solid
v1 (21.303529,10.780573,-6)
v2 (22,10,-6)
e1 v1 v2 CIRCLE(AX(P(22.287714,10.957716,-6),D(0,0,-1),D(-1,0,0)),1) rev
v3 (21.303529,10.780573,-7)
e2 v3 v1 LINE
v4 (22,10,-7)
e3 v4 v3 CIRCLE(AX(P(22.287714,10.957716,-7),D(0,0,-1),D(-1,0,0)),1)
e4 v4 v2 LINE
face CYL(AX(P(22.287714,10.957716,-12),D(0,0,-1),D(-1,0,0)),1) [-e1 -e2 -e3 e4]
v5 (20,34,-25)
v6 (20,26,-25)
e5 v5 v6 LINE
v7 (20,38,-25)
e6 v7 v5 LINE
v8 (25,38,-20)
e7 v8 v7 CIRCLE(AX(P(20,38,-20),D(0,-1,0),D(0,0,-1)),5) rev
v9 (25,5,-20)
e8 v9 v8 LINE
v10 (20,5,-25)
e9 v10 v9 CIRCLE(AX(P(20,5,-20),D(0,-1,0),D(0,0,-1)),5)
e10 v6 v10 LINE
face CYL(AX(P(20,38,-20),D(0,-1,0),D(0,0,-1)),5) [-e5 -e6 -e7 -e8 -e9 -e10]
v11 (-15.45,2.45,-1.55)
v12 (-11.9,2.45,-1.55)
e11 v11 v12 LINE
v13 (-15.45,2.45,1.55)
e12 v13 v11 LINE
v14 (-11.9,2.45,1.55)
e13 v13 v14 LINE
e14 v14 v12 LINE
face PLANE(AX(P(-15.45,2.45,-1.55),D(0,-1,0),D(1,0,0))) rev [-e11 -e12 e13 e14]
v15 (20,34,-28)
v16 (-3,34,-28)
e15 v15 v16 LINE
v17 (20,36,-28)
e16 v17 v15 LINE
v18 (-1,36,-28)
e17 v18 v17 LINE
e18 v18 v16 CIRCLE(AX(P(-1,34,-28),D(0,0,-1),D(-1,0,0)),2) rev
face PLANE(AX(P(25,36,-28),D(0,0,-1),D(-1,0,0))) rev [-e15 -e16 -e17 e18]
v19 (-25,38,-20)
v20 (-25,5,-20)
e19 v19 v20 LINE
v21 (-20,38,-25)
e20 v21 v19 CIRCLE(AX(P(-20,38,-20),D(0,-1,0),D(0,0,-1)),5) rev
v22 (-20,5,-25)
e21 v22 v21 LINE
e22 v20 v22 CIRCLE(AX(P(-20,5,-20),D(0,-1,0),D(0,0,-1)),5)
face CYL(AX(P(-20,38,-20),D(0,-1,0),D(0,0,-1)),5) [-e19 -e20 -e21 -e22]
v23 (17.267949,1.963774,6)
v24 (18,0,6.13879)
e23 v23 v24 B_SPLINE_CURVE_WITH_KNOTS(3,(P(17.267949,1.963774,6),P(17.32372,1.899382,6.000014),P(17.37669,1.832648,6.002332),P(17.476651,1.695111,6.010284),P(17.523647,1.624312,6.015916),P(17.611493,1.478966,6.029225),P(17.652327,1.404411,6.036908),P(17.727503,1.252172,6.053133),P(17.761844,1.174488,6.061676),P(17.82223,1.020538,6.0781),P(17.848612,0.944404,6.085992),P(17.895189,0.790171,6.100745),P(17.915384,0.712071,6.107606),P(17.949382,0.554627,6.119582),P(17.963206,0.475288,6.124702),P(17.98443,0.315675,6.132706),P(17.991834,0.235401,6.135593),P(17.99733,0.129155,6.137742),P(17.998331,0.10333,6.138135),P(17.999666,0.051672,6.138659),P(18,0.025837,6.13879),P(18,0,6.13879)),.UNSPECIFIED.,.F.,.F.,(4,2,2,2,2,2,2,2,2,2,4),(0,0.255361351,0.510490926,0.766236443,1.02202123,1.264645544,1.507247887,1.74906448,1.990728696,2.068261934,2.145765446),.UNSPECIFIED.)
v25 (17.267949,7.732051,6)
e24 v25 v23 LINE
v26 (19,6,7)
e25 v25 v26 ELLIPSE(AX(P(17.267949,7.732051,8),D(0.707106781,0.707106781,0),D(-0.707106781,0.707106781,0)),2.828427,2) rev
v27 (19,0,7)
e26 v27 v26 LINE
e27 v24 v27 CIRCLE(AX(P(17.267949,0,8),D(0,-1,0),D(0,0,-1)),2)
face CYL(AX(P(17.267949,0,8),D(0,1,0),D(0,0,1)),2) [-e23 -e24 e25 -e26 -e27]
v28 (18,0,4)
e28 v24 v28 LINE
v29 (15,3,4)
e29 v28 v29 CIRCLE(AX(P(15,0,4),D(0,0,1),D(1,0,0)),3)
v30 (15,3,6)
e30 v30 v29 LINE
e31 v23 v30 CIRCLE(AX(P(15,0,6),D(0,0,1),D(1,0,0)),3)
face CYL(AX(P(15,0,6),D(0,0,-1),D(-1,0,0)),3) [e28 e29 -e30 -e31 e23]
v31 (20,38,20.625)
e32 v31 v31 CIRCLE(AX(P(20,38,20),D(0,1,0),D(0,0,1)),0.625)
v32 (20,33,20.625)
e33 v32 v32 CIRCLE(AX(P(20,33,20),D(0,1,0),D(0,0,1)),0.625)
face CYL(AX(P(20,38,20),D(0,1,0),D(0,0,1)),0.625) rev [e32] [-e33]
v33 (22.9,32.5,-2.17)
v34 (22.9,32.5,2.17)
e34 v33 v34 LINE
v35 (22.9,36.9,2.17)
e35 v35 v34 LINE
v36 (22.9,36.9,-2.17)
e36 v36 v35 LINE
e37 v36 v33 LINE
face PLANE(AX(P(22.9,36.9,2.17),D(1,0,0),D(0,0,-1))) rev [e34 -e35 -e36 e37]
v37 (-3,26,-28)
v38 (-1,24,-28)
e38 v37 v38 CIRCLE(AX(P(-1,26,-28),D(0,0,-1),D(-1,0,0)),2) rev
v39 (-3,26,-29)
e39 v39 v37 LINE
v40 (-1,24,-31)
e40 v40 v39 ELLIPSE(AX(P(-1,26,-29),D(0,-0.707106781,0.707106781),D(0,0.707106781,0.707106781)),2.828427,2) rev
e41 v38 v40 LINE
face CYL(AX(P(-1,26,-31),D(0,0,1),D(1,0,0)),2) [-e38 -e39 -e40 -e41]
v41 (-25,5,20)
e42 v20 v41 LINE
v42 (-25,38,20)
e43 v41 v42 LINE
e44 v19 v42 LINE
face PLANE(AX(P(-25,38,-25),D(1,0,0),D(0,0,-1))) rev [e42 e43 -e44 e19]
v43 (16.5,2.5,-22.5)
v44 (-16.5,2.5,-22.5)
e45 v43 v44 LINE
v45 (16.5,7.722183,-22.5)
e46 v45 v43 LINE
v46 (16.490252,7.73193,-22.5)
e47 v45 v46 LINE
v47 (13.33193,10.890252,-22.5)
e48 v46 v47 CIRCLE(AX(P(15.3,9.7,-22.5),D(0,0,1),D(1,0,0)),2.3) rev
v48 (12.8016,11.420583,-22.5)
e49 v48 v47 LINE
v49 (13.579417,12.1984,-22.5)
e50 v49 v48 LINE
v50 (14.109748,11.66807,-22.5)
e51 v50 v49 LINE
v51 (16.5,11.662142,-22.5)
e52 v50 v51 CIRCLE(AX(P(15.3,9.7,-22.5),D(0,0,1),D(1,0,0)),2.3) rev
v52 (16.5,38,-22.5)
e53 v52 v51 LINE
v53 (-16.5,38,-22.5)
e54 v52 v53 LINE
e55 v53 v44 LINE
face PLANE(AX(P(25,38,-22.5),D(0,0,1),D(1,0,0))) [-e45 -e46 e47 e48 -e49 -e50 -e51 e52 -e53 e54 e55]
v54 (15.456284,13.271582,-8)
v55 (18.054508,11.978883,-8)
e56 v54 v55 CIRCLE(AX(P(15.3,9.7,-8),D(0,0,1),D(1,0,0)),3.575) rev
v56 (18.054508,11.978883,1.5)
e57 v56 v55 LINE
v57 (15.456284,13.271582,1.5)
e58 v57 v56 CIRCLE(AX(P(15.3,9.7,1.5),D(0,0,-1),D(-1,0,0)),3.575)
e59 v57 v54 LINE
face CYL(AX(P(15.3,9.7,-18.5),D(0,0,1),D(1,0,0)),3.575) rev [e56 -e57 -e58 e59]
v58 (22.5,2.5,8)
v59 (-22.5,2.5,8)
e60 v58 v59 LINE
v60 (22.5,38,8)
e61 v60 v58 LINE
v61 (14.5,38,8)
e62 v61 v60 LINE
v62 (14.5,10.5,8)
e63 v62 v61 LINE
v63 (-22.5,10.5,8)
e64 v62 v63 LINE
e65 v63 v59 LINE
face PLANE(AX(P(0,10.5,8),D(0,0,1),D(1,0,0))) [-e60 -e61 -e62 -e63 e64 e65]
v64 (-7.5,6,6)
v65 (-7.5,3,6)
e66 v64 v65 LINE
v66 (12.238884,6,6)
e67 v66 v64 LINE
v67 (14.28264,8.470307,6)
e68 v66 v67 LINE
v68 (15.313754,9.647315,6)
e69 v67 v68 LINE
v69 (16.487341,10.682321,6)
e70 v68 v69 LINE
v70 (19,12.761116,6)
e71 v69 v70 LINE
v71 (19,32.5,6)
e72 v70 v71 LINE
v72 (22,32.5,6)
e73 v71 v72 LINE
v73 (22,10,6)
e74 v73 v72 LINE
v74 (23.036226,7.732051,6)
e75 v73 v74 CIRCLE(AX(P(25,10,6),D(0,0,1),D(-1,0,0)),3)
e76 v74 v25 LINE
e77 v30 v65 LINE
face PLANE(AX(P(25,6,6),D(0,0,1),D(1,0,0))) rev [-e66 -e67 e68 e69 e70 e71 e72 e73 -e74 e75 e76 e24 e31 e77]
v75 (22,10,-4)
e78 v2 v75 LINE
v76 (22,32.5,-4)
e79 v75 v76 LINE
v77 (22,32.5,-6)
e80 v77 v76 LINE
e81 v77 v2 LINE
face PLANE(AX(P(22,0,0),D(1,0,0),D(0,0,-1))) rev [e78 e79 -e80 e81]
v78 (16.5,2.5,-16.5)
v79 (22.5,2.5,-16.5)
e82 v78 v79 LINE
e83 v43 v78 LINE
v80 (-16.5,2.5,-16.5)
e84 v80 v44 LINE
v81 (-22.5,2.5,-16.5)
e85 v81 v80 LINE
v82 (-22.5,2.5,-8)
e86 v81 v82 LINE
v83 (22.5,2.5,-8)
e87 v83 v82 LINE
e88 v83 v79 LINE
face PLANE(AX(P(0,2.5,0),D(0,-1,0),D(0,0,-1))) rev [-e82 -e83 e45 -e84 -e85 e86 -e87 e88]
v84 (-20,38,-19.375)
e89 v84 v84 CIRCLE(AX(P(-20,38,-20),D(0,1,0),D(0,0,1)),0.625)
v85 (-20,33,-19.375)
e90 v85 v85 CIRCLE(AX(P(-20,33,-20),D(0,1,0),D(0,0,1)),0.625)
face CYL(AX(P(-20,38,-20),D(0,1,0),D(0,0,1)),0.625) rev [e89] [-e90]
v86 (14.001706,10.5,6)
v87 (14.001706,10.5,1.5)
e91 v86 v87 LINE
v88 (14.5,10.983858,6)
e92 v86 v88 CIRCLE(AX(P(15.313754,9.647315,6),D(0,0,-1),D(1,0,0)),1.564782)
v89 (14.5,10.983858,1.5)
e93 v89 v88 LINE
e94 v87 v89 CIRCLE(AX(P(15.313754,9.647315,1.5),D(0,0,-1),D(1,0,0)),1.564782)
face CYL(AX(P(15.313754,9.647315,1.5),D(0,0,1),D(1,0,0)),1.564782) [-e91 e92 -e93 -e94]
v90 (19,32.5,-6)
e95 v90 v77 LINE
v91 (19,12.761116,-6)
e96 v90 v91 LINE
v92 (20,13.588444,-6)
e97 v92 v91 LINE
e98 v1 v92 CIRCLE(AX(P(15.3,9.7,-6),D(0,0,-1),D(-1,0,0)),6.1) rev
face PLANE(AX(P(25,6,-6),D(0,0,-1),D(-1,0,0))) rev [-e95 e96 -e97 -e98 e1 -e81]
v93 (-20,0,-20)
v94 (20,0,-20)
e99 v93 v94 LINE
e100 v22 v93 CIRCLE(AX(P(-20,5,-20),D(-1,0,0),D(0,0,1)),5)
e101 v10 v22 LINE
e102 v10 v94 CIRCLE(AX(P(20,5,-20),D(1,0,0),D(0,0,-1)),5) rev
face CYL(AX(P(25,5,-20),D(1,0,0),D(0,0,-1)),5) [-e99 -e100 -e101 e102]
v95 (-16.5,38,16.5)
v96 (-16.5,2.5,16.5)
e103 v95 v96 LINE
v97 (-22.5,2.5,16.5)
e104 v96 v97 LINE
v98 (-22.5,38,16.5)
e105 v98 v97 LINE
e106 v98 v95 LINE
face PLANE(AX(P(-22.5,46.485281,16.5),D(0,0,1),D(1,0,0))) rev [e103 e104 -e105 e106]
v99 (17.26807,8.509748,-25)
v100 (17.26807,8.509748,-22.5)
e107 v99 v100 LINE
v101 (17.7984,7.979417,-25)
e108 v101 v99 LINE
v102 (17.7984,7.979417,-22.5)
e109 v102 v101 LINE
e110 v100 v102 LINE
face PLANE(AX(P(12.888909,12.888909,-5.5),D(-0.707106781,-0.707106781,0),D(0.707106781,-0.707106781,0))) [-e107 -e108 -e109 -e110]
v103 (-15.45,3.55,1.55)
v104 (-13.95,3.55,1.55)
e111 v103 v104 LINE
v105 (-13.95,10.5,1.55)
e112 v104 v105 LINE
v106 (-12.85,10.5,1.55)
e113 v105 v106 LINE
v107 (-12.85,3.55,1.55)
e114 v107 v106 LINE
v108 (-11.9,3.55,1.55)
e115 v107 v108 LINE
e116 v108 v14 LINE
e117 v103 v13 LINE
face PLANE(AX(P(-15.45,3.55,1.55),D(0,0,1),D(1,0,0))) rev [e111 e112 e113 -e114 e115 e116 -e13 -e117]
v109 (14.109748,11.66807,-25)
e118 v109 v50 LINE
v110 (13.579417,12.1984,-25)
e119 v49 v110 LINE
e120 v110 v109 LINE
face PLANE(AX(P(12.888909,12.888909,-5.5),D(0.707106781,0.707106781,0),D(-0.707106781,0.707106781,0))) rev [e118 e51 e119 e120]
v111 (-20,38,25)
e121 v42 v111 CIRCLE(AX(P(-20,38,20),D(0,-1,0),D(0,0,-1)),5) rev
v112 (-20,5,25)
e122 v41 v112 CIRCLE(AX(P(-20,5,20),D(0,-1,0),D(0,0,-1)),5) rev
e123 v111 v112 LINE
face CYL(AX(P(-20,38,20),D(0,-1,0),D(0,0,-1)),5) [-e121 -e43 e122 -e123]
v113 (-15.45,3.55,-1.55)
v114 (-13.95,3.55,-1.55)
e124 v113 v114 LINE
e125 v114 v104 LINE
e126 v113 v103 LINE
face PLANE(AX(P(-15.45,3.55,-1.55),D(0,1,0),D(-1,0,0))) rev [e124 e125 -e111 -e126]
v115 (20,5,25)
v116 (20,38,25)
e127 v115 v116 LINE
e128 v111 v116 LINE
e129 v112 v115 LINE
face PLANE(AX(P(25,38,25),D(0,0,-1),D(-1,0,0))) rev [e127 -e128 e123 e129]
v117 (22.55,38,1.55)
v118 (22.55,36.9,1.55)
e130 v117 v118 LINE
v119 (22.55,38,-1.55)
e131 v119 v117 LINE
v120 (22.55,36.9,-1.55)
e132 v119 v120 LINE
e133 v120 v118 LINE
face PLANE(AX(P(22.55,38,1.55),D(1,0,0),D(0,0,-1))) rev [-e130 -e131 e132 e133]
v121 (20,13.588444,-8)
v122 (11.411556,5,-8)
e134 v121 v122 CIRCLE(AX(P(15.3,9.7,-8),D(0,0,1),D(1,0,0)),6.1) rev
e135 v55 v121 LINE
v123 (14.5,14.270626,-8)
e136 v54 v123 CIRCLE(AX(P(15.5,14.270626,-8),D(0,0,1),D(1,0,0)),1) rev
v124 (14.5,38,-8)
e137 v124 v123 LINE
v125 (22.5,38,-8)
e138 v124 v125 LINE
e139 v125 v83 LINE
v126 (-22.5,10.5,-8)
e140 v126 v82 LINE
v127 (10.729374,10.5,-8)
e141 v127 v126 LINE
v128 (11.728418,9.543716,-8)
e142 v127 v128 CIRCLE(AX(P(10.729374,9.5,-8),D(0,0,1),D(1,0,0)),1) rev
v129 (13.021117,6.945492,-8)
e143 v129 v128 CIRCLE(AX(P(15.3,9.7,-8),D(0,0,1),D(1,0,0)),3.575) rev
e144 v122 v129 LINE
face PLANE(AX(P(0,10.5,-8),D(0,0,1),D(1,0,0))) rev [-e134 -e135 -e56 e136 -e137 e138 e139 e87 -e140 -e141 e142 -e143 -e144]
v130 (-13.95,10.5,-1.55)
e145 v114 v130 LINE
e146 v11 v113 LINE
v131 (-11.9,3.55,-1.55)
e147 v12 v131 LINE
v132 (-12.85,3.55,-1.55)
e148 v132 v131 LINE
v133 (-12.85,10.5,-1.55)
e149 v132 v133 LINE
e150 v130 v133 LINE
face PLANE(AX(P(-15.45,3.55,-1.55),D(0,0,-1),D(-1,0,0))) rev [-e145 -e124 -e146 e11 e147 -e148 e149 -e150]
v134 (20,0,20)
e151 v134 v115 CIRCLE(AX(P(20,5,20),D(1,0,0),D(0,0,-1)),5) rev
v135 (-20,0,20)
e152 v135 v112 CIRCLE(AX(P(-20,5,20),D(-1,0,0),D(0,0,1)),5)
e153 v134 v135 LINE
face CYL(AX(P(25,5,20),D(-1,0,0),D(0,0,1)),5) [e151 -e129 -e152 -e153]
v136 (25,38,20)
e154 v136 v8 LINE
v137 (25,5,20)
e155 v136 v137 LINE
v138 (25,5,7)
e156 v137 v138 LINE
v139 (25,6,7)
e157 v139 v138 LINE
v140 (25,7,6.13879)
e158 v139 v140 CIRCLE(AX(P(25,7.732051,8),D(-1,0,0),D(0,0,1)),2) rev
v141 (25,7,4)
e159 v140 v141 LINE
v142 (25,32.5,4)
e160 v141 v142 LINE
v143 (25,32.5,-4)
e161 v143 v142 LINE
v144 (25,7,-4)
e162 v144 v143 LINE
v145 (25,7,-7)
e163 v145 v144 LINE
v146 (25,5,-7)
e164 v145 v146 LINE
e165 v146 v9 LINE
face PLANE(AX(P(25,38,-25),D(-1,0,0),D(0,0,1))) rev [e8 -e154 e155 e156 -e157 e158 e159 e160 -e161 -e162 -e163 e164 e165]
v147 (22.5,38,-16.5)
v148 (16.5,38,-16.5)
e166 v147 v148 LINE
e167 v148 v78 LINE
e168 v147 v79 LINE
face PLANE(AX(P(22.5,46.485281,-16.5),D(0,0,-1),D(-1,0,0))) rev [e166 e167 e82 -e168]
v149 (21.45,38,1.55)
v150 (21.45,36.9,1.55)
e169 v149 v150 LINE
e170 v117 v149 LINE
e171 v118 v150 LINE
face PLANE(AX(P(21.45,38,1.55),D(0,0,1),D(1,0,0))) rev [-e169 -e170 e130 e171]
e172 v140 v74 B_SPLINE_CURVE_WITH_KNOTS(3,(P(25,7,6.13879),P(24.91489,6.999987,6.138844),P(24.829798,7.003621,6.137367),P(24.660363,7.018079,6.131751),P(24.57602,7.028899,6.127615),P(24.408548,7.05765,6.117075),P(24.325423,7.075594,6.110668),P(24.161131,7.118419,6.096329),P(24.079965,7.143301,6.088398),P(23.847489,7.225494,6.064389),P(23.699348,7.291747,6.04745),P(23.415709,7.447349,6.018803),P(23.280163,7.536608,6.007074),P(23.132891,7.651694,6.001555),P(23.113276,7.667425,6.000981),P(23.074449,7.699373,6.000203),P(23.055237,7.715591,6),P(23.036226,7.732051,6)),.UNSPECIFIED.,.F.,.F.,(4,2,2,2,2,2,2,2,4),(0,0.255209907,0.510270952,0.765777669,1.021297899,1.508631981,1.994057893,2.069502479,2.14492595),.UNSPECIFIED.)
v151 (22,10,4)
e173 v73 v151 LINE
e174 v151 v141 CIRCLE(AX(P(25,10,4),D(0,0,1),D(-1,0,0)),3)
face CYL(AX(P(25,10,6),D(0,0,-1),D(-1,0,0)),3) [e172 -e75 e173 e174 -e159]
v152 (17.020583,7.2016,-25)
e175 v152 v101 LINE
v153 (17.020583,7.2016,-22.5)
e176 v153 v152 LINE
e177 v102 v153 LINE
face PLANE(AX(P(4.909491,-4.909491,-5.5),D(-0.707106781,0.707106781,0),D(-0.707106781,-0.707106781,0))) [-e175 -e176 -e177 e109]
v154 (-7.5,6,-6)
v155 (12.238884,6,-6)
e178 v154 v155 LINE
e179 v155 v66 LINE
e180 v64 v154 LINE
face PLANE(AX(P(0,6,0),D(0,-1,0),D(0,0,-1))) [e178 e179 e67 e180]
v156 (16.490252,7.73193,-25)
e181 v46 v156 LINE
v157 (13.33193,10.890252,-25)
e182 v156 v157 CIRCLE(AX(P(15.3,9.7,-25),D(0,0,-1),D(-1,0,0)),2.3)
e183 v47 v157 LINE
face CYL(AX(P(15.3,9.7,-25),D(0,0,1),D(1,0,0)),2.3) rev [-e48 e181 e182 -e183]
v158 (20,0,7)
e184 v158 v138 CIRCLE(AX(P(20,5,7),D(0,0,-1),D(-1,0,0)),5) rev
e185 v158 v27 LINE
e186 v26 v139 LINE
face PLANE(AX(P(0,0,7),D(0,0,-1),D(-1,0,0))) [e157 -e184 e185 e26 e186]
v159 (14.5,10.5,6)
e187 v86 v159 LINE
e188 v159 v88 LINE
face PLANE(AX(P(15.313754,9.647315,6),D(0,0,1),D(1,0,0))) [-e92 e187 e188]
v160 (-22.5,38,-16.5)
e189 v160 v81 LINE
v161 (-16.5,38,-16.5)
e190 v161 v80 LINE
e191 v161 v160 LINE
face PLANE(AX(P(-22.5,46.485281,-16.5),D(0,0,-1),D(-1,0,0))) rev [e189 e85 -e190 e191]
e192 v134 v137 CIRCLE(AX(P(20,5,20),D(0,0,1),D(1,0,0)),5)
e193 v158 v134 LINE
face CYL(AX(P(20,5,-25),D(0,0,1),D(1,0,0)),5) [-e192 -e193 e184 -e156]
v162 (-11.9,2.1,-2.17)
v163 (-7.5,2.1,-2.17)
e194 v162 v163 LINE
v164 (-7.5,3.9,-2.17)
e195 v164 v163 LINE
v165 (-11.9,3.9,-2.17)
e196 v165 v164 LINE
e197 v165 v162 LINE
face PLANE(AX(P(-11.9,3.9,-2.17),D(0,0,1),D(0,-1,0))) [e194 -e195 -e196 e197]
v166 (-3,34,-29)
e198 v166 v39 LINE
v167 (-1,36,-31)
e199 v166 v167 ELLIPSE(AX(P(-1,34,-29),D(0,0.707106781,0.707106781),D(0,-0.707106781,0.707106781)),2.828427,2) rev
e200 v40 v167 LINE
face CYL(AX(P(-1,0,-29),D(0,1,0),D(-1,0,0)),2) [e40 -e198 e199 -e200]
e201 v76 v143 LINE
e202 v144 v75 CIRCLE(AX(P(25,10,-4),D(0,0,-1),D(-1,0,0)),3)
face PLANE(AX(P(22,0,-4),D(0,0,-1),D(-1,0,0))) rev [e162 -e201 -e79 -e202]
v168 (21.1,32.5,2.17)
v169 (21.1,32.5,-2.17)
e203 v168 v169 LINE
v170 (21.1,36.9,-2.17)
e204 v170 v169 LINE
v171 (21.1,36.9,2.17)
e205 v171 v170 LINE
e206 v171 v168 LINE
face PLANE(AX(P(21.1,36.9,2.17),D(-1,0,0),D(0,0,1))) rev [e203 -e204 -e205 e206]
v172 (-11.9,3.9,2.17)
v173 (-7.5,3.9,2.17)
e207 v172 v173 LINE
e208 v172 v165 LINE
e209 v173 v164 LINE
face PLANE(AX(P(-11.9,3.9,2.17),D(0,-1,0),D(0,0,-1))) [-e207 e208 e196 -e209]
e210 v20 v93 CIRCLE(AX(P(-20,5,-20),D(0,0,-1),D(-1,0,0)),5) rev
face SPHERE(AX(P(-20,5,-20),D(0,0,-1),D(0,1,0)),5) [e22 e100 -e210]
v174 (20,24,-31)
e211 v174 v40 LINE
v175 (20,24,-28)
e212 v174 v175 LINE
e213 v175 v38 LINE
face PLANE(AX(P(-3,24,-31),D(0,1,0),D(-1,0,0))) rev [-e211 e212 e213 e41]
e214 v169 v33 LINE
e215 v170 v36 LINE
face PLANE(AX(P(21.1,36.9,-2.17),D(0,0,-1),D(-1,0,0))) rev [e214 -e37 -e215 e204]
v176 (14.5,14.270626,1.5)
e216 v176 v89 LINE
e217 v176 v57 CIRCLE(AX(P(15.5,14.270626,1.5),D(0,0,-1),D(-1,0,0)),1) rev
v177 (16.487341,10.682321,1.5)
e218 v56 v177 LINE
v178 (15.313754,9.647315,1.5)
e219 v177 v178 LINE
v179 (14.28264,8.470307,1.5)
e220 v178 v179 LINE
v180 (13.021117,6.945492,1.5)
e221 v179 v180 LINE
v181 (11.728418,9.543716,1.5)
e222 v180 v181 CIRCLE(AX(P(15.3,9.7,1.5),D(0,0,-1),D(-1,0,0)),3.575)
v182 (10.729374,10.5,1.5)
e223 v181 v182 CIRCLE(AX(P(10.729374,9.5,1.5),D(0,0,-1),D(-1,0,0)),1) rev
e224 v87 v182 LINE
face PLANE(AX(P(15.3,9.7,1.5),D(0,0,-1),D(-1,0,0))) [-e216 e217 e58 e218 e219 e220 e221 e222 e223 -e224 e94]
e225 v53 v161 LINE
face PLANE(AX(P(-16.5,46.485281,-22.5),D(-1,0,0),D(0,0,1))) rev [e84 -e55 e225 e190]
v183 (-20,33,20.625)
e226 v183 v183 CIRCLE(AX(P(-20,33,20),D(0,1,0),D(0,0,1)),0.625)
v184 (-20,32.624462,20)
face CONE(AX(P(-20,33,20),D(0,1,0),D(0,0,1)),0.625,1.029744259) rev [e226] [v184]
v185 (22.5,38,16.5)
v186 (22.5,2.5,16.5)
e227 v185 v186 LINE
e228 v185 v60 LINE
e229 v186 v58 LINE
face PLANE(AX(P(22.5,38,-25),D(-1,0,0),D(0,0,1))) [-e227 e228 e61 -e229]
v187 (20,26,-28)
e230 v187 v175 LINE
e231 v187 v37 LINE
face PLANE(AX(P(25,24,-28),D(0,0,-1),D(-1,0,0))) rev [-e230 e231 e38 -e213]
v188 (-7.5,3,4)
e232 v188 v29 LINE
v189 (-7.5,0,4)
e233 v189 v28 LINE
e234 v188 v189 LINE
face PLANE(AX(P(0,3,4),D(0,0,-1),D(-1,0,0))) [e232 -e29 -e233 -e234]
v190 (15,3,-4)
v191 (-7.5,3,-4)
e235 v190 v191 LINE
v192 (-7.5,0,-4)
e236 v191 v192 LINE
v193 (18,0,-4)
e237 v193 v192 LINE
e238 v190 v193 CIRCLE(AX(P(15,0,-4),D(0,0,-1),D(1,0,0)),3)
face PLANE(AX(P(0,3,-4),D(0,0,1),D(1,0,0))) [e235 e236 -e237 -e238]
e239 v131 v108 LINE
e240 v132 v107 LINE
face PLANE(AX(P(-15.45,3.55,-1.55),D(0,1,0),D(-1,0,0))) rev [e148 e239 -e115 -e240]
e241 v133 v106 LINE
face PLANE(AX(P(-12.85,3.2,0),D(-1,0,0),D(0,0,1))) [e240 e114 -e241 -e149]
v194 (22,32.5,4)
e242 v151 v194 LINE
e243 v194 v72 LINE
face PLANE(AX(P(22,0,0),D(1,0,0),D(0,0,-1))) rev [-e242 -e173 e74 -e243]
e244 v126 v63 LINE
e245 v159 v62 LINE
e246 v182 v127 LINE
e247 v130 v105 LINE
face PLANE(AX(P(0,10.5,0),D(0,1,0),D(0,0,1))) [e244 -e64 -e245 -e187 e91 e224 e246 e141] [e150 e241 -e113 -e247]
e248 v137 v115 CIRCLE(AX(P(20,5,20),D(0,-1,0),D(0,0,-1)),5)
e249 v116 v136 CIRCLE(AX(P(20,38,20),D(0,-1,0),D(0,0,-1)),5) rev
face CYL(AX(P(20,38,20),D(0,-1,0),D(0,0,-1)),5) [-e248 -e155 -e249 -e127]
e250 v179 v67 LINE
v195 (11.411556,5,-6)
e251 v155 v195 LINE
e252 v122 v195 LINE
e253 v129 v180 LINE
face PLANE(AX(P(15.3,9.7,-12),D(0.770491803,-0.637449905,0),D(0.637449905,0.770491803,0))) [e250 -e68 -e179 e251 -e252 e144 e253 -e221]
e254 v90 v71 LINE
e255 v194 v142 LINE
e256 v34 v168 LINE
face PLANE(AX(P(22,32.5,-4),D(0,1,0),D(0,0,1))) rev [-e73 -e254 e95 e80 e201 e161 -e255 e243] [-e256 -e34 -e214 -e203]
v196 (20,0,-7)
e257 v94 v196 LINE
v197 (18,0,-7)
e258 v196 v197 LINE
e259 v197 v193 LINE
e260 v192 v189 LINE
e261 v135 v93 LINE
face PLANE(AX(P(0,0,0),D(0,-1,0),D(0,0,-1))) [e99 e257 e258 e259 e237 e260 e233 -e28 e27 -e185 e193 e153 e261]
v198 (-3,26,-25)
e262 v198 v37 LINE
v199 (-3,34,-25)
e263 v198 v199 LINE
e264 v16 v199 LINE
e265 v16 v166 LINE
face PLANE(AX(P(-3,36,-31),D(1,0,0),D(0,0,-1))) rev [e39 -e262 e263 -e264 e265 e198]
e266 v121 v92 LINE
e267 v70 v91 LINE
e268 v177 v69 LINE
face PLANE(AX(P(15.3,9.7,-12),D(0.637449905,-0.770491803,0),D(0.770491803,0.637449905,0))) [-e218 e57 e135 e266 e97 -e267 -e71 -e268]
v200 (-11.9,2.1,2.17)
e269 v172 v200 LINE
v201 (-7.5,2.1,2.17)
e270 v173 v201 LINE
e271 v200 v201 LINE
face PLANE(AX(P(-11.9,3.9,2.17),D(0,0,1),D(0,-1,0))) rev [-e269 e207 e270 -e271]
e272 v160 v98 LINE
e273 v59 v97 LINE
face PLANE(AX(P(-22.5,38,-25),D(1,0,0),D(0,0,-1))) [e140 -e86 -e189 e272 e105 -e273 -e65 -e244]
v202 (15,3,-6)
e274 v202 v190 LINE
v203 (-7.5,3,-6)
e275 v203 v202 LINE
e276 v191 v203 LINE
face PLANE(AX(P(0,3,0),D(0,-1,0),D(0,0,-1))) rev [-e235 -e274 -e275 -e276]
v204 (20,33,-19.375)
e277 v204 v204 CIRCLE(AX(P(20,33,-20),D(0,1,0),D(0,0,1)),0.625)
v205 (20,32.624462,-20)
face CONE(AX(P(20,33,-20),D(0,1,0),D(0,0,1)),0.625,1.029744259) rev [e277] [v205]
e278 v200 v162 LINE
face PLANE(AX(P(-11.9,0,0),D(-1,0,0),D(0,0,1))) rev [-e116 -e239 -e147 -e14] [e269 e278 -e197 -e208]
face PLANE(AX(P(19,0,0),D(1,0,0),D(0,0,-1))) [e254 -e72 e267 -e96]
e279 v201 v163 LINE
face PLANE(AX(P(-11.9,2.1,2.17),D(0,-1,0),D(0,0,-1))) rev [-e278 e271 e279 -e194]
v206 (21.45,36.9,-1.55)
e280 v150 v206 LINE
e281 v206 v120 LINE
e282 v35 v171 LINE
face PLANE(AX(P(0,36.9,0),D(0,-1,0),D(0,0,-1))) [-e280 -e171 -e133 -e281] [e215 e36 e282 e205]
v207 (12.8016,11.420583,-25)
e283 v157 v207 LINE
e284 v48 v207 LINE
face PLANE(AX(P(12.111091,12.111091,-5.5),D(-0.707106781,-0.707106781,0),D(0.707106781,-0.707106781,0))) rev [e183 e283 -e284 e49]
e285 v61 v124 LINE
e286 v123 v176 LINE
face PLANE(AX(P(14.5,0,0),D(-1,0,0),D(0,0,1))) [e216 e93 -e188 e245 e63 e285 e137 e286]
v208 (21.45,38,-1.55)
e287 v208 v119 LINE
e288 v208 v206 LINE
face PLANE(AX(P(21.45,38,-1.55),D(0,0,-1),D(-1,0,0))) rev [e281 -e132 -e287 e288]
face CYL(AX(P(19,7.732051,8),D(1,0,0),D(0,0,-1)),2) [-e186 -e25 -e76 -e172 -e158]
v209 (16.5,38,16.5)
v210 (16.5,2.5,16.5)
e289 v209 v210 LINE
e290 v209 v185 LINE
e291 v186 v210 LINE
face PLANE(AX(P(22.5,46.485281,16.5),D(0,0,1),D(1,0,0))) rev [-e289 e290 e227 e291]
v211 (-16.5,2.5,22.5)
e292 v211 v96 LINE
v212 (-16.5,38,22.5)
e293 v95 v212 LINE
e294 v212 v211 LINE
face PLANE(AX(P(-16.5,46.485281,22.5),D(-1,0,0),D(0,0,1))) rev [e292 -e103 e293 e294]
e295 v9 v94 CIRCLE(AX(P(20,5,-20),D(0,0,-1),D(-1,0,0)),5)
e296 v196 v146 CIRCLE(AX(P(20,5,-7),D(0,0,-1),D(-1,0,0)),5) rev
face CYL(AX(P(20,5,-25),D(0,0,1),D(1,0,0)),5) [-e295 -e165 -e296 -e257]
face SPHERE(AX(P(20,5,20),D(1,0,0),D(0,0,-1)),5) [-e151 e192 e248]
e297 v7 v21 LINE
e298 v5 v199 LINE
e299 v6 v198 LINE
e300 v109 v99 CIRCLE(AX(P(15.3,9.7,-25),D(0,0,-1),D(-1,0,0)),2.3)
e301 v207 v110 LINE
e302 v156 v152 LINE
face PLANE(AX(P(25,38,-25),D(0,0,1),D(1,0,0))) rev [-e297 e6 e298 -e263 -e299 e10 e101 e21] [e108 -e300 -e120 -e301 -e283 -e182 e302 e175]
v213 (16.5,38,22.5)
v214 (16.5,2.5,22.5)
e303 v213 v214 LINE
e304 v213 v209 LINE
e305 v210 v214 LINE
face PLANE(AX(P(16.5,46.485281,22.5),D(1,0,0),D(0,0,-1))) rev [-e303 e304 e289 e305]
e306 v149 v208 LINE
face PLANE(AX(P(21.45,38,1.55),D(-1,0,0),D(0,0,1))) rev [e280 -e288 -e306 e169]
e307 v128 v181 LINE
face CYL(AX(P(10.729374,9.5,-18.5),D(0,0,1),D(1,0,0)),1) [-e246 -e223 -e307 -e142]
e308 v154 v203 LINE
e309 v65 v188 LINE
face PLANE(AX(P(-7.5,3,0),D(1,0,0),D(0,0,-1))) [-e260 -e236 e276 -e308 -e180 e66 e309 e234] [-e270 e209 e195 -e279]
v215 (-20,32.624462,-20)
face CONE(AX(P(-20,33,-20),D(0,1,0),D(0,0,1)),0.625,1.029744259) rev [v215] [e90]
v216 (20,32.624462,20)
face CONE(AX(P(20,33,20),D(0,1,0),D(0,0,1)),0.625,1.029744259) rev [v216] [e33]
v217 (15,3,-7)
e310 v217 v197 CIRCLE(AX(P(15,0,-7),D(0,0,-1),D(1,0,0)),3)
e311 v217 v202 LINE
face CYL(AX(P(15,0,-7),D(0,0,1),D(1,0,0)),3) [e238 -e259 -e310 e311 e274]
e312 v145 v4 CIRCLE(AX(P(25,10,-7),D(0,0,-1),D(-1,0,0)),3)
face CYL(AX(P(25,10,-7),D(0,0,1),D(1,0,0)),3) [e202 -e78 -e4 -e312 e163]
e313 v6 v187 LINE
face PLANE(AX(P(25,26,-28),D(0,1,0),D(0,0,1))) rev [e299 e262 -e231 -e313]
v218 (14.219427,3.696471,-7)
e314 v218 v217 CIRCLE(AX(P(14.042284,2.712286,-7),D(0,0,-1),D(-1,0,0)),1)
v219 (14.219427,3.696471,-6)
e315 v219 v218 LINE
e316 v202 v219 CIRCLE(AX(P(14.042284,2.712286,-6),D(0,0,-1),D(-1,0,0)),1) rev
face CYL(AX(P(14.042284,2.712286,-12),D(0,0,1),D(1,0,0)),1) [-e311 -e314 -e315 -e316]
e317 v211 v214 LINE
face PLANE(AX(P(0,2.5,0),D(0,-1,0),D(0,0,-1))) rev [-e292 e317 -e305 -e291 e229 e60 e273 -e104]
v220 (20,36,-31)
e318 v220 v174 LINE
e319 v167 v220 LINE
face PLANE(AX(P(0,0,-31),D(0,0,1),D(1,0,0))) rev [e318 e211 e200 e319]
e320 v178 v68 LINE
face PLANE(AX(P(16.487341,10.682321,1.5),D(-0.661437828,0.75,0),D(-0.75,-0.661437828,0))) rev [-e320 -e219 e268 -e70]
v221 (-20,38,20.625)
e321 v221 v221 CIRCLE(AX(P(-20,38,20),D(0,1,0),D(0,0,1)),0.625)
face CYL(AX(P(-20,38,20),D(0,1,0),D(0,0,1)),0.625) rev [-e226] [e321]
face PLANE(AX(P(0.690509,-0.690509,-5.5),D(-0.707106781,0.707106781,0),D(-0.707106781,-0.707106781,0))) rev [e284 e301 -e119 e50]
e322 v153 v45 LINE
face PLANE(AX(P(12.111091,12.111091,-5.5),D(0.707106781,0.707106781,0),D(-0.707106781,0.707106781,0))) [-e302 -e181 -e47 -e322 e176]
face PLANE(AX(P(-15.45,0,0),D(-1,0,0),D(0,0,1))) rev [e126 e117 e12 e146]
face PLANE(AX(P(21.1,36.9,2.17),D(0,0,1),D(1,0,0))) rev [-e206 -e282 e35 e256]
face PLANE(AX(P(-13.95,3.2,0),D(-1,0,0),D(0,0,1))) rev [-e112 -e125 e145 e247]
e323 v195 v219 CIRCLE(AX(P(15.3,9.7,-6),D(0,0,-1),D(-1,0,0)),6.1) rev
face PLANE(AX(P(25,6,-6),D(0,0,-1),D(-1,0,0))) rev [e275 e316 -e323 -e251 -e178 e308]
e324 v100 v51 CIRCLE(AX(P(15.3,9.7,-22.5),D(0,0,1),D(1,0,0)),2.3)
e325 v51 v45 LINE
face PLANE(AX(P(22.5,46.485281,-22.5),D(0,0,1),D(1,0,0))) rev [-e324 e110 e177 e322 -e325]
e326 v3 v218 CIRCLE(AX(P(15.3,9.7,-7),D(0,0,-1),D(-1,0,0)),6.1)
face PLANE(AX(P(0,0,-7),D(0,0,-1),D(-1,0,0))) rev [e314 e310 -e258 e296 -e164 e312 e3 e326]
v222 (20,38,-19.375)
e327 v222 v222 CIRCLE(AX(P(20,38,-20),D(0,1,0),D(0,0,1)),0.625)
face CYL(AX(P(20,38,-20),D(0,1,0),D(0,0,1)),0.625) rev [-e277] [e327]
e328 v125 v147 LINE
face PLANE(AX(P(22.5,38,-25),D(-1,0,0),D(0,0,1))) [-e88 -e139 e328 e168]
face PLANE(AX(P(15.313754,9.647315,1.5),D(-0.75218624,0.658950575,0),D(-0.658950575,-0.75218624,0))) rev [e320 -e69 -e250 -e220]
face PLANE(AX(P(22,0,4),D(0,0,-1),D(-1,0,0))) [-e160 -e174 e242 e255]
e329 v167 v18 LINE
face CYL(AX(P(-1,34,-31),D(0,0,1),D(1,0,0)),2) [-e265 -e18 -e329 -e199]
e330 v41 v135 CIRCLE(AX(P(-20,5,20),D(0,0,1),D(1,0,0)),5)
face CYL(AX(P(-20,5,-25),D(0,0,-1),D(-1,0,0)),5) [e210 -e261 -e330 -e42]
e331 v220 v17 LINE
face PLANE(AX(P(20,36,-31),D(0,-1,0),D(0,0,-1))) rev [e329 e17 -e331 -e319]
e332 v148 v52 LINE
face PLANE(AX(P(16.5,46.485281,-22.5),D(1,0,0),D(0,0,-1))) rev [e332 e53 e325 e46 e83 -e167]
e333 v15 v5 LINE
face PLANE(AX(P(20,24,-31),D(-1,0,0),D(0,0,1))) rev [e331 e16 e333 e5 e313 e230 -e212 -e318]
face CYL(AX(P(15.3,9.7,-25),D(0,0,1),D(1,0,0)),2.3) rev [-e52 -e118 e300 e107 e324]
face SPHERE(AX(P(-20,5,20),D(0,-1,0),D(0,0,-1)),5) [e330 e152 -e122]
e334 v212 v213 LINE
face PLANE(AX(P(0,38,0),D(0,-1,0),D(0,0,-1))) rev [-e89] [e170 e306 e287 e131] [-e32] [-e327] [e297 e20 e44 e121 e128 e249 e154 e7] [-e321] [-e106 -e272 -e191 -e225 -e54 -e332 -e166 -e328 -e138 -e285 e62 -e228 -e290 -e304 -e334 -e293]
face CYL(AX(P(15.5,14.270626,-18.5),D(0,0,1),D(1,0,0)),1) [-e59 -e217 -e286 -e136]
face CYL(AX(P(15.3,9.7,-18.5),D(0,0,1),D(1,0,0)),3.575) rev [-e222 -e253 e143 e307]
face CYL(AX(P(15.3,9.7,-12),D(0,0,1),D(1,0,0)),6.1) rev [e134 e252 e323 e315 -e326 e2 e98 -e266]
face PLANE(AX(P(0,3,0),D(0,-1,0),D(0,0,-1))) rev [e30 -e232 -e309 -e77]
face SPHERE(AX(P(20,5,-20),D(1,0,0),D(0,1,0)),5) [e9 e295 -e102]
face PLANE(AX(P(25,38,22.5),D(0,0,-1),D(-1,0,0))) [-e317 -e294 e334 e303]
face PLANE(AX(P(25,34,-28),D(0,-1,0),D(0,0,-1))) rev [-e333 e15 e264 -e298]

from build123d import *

# Parameters (mm, degrees)
SKETCH1_W                = 50
SKETCH1_H                = 50
BOSS_EXTRUDE1_DEPTH      = 38
SHELL1_T                 = -2.5
SKETCH3_W                = 45
SKETCH3_H                = 16
BOSS_EXTRUDE3_DEPTH      = 8
SKETCH4_W                = 32.5
SKETCH4_H                = 8
CUT_EXTRUDE1_DEPTH       = 3
SKETCH7_W                = 32.5
SKETCH7_H                = 12
CUT_EXTRUDE2_DEPTH       = 3
SKETCH8_W                = 16
SKETCH8_H                = 27.5
BOSS_EXTRUDE4_DEPTH      = 8
SKETCH9_W                = 8
SKETCH9_H                = 32.5
CUT_EXTRUDE3_DEPTH       = 3
CUT_EXTRUDE5_DEPTH       = 3
CUT_EXTRUDE7_DEPTH       = 10
CUT_EXTRUDE7_DEPTH_BACK  = 2
SKETCH13_W               = 3
SKETCH13_H               = 3.011524732
FILLET1_R                = 5
SKETCH16_R               = 2.3
CUT_EXTRUDE8_DEPTH       = 53.642663306
SKETCH17_W               = 23
SKETCH17_H               = 12
BOSS_EXTRUDE5_DEPTH      = 6
SKETCH18_W               = 3
SKETCH18_H               = 2
CUT_EXTRUDE9_DEPTH       = 57.471231614
CUT_EXTRUDE12_DEPTH      = 2
CUT_EXTRUDE13_DEPTH      = 2
CUT_EXTRUDE14_DEPTH      = 16
CUT_EXTRUDE10_START      = -19.5
CUT_EXTRUDE10_DEPTH      = 19.5
FILLET4_R                = 2
CUT_EXTRUDE18_DEPTH      = 13
CUT_EXTRUDE18_DEPTH_BACK = 1
SKETCH26_W               = 6
SKETCH26_H               = 6
BOSS_EXTRUDE6_DEPTH      = 4.5
SKETCH30_W               = 4.34
SKETCH30_H               = 1.8
CUT_EXTRUDE19_DEPTH      = 4.4
SKETCH31_W               = 1.8
SKETCH31_H               = 4.34
CUT_EXTRUDE20_DEPTH      = 4.4
SKETCH32_W               = 1.1
SKETCH32_H               = 3.1
CUT_EXTRUDE21_DEPTH      = 55.291896265
SKETCH33_W               = 3.1
SKETCH33_H               = 1.1
CUT_EXTRUDE22_DEPTH      = 3.55
SKETCH34_W               = 1.1
SKETCH34_H               = 3.1
CUT_EXTRUDE23_DEPTH      = 7.3
CUT_EXTRUDE26_DEPTH      = 2
SKETCH45_R               = 3.575
CUT_EXTRUDE27_DEPTH      = 20
FILLET8_R                = 2
SKETCH46_W               = 1.850257739
SKETCH46_H               = 4
SKETCH46_W_2             = 4
SKETCH46_H_2             = 1.850257739
CUT_EXTRUDE28_DEPTH      = 1
CUT_EXTRUDE25_START      = -3
CUT_EXTRUDE25_DEPTH      = 3
CUT_EXTRUDE24_START      = -3
CUT_EXTRUDE24_DEPTH      = 3
FILLET9_R                = 1
FILLET10_R               = 1
SKETCH47_W               = 6
SKETCH47_H               = 6
BOSS_EXTRUDE7_DEPTH      = 35.5
M1_6_TAPPED_HOLE1_D      = 1.25
M1_6_TAPPED_HOLE1_DEPTH  = 5
M1_6_TAPPED_HOLE1_TIP    = 0.375537887


with BuildPart() as part:
    # Sketch1 → Boss-Extrude1 (new body)
    with BuildSketch(Plane(origin=(0, 0, 0), x_dir=(1, 0, 0), z_dir=(0, 1, 0))):
        Rectangle(SKETCH1_W, SKETCH1_H)
    extrude(amount=BOSS_EXTRUDE1_DEPTH)

    # Shell1
    shell1_openings = [part.faces().sort_by_distance(p)[0] for p in [
        (0, 38, 0),
    ]]
    offset(amount=SHELL1_T, openings=shell1_openings, kind=Kind.INTERSECTION)

    # Sketch3 → Boss-Extrude3 (add)
    with BuildSketch(Plane(origin=(0, 2.5, 0), x_dir=(1, 0, 0), z_dir=(0, 1, 0))):
        Rectangle(SKETCH3_W, SKETCH3_H)
    extrude(amount=BOSS_EXTRUDE3_DEPTH)

    # Sketch4 → Cut-Extrude1 (cut)
    with BuildSketch(Plane.XZ):
        with Locations((8.75, 0)):
            Rectangle(SKETCH4_W, SKETCH4_H)
    extrude(amount=-CUT_EXTRUDE1_DEPTH, mode=Mode.SUBTRACT)

    # Sketch7 → Cut-Extrude2 (cut)
    with BuildSketch(Plane(origin=(0, 3, 0), x_dir=(-1, 0, 0), z_dir=(0, -1, 0))):
        with Locations((-8.75, 0)):
            Rectangle(SKETCH7_W, SKETCH7_H)
    extrude(amount=-CUT_EXTRUDE2_DEPTH, mode=Mode.SUBTRACT)

    # Sketch8 → Boss-Extrude4 (add)
    with BuildSketch(Plane.ZY.offset(-22.5)):
        with Locations((0, 24.25)):
            Rectangle(SKETCH8_W, SKETCH8_H)
    extrude(amount=BOSS_EXTRUDE4_DEPTH)

    # Sketch9 → Cut-Extrude3 (cut)
    with BuildSketch(Plane(origin=(25, 0, 0), x_dir=(0, 0, -1), z_dir=(1, 0, 0))):
        with Locations((0, 16.25)):
            Rectangle(SKETCH9_W, SKETCH9_H)
    extrude(amount=-CUT_EXTRUDE3_DEPTH, mode=Mode.SUBTRACT)

    # Sketch10 → Cut-Extrude5 (cut)
    with BuildSketch(Plane(origin=(22, 0, 0), x_dir=(0, 0, -1), z_dir=(1, 0, 0))):
        Polygon((-6, 32.5), (-6, 0), (6, 0), (6, 3), (6, 32.5), align=None)
    extrude(amount=-CUT_EXTRUDE5_DEPTH, mode=Mode.SUBTRACT)

    # Sketch13 → Cut-Extrude7 (cut, two sides: drawn at the far end of the back side and taken through both)
    with BuildSketch(Plane(origin=(0, 0, 4), x_dir=(-1, 0, 0), z_dir=(0, 0, -1)).offset(-CUT_EXTRUDE7_DEPTH_BACK)):
        with Locations((-23.5, 1.505762366)):
            Rectangle(SKETCH13_W, SKETCH13_H)
    extrude(amount=CUT_EXTRUDE7_DEPTH + CUT_EXTRUDE7_DEPTH_BACK, mode=Mode.SUBTRACT)

    # Fillet1
    fillet1_edges = [part.edges().sort_by_distance(p)[0] for p in [
        (25, 0, -15.5),
        (0, 0, -25),
        (25, 0, 15.5),
        (0, 0, 25),
        (-25, 0, 0),
        (-25, 19, -25),
        (25, 19, -25),
        (25, 19, 25),
        (-25, 19, 25),
    ]]
    fillet(fillet1_edges, radius=FILLET1_R)

    # Sketch16 → Cut-Extrude8 (cut, through all)
    with BuildSketch(Plane(origin=(0, 0, 1.5), x_dir=(-1, 0, 0), z_dir=(0, 0, -1))):
        with Locations(Location((-15.3, 9.7, 0), (0, 0, 180))):
            Circle(SKETCH16_R)
    extrude(amount=CUT_EXTRUDE8_DEPTH, mode=Mode.SUBTRACT)

    # Sketch17 → Boss-Extrude5 (add)
    with BuildSketch(Plane(origin=(0, 0, -25), x_dir=(-1, 0, 0), z_dir=(0, 0, -1))):
        with Locations((-8.5, 30)):
            Rectangle(SKETCH17_W, SKETCH17_H)
    extrude(amount=BOSS_EXTRUDE5_DEPTH)

    # Sketch18 → Cut-Extrude9 (cut, through all)
    with BuildSketch(Plane.ZY.offset(3)):
        with Locations((-26.5, 25)):
            Rectangle(SKETCH18_W, SKETCH18_H)
        with Locations((-26.5, 35)):
            Rectangle(SKETCH18_W, SKETCH18_H)
    extrude(amount=-CUT_EXTRUDE9_DEPTH, mode=Mode.SUBTRACT)

    # Sketch20 → Cut-Extrude12 (cut)
    with BuildSketch(Plane(origin=(0, 0, 4), x_dir=(-1, 0, 0), z_dir=(0, 0, -1))):
        with BuildLine():
            Line((-22, 10), (-22, 7))
            Line((-22, 7), (-22, 6))
            Line((-22, 6), (-24, 6))
            Line((-24, 6), (-25, 6))
            Line((-25, 6), (-25, 7))
            ThreePointArc((-25, 7), (-22.878679656, 7.878679656), (-22, 10))
        make_face()
    extrude(amount=-CUT_EXTRUDE12_DEPTH, mode=Mode.SUBTRACT)

    # Sketch21 → Cut-Extrude13 (cut)
    with BuildSketch(Plane(origin=(0, 0, 4), x_dir=(-1, 0, 0), z_dir=(0, 0, -1))):
        with BuildLine():
            Line((-19, 3), (-19, 0))
            Line((-19, 0), (-18, 0))
            ThreePointArc((-18, 0), (-17.121320344, 2.121320344), (-15, 3))
            Line((-15, 3), (-19, 3))
        make_face()
    extrude(amount=-CUT_EXTRUDE13_DEPTH, mode=Mode.SUBTRACT)

    # Sketch22 → Cut-Extrude14 (cut)
    with BuildSketch(Plane(origin=(0, 0, 4), x_dir=(-1, 0, 0), z_dir=(0, 0, -1))):
        with BuildLine():
            Line((-15.3, 9.7), (-11.411555581, 5))
            ThreePointArc((-11.411555581, 5), (-19.613351365, 5.386648635), (-20, 13.588444419))
            Line((-20, 13.588444419), (-15.3, 9.7))
        make_face()
    extrude(amount=CUT_EXTRUDE14_DEPTH, mode=Mode.SUBTRACT)

    # Sketch19 → Cut-Extrude10 (cut)
    with BuildSketch(Plane(origin=(0, 0, -25), x_dir=(-1, 0, 0), z_dir=(0, 0, -1)).offset(CUT_EXTRUDE10_START)):
        with BuildLine():
            ThreePointArc((-16.49025244, 7.731930101), (-16.926345597, 8.073654403), (-17.268069899, 8.50974756))
            Line((-17.268069899, 8.50974756), (-17.798399985, 7.979417474))
            Line((-17.798399985, 7.979417474), (-17.020582526, 7.201600015))
            Line((-17.020582526, 7.201600015), (-16.49025244, 7.731930101))
        make_face()
        with BuildLine():
            ThreePointArc((-14.10974756, 11.668069899), (-13.673654403, 11.326345597), (-13.331930101, 10.89025244))
            Line((-13.331930101, 10.89025244), (-12.801600015, 11.420582526))
            Line((-12.801600015, 11.420582526), (-13.579417474, 12.198399985))
            Line((-13.579417474, 12.198399985), (-14.10974756, 11.668069899))
        make_face()
    extrude(amount=CUT_EXTRUDE10_DEPTH, mode=Mode.SUBTRACT)

    # Fillet4
    fillet4_edges = [part.edges().sort_by_distance(p)[0] for p in [
        (-3, 36, -29.5),
        (-3, 24, -29.5),
        (-3, 30, -31),
    ]]
    fillet(fillet4_edges, radius=FILLET4_R)

    # Sketch26 → Cut-Extrude18 (cut, two sides: drawn at the far end of the back side and taken through both)
    with BuildSketch(Plane(origin=(0, 0, 6), x_dir=(-1, 0, 0), z_dir=(0, 0, -1)).offset(-CUT_EXTRUDE18_DEPTH_BACK)):
        with Locations((-22, 3)):
            Rectangle(SKETCH26_W, SKETCH26_H)
    extrude(amount=CUT_EXTRUDE18_DEPTH + CUT_EXTRUDE18_DEPTH_BACK, mode=Mode.SUBTRACT)

    # Sketch29 → Boss-Extrude6 (add)
    with BuildSketch(Plane(origin=(0, 0, 6), x_dir=(-1, 0, 0), z_dir=(0, 0, -1))):
        with BuildLine():
            Line((-16.487340596, 10.682320832), (-15.313754074, 9.647314806))
            Line((-15.313754074, 9.647314806), (-14.282640056, 8.470307295))
            ThreePointArc((-14.282640056, 8.470307295), (-14.205455569, 10.751949236), (-16.487340596, 10.682320832))
        make_face()
    extrude(amount=BOSS_EXTRUDE6_DEPTH)

    # Sketch30 → Cut-Extrude19 (cut)
    with BuildSketch(Plane(origin=(-7.5, 0, 0), x_dir=(0, 0, -1), z_dir=(1, 0, 0))):
        with Locations((0, 3)):
            Rectangle(SKETCH30_W, SKETCH30_H)
    extrude(amount=-CUT_EXTRUDE19_DEPTH, mode=Mode.SUBTRACT)

    # Sketch31 → Cut-Extrude20 (cut)
    with BuildSketch(Plane.XZ.offset(-32.5)):
        with Locations((22, 0)):
            Rectangle(SKETCH31_W, SKETCH31_H)
    extrude(amount=-CUT_EXTRUDE20_DEPTH, mode=Mode.SUBTRACT)

    # Sketch32 → Cut-Extrude21 (cut, through all)
    with BuildSketch(Plane.XZ.offset(-36.9)):
        with Locations((22, 0)):
            Rectangle(SKETCH32_W, SKETCH32_H)
    extrude(amount=-CUT_EXTRUDE21_DEPTH, mode=Mode.SUBTRACT)

    # Sketch33 → Cut-Extrude22 (cut)
    with BuildSketch(Plane(origin=(-11.9, 0, 0), x_dir=(0, 0, -1), z_dir=(1, 0, 0))):
        with Locations((0, 3)):
            Rectangle(SKETCH33_W, SKETCH33_H)
    extrude(amount=-CUT_EXTRUDE22_DEPTH, mode=Mode.SUBTRACT)

    # Sketch34 → Cut-Extrude23 (cut)
    with BuildSketch(Plane(origin=(0, 10.5, 0), x_dir=(1, 0, 0), z_dir=(0, 1, 0))):
        with Locations((-13.4, 0)):
            Rectangle(SKETCH34_W, SKETCH34_H)
    extrude(amount=-CUT_EXTRUDE23_DEPTH, mode=Mode.SUBTRACT)

    # Sketch44 → Cut-Extrude26 (cut)
    with BuildSketch(Plane(origin=(0, 0, 4), x_dir=(-1, 0, 0), z_dir=(0, 0, -1))):
        Polygon((-19, 12.761115819), (-19, 6), (-12.238884181, 6), (-14.282640056, 8.470307295), (-15.313754074, 9.647314806), (-16.487340596, 10.682320832), align=None)
    extrude(amount=-CUT_EXTRUDE26_DEPTH, mode=Mode.SUBTRACT)

    # Sketch45 → Cut-Extrude27 (cut)
    with BuildSketch(Plane(origin=(0, 0, 1.5), x_dir=(-1, 0, 0), z_dir=(0, 0, -1))):
        with Locations((-15.3, 9.7)):
            Circle(SKETCH45_R)
    extrude(amount=CUT_EXTRUDE27_DEPTH, mode=Mode.SUBTRACT)

    # Fillet8
    # the kernel refuses this fillet: 2 mm, written as the material it takes off along each edge
    with BuildSketch(Plane(origin=(19, 6, 6), x_dir=(-1, 0, 0), z_dir=(0, -1, 0))) as fillet8_piece_1_section:
        with BuildLine():
            CenterArc((1.732050808, -2), FILLET8_R, 90, 60)
            Line((0, -1), (0, 0))
            Line((0, 0), (1.732050808, 0))
        make_face()
    fillet8_piece_1 = extrude(amount=10.330127019, mode=Mode.PRIVATE)
    fillet8_piece_1 = fillet8_piece_1 - Plane(origin=(15, 0, 6), x_dir=(1, 0, 0), z_dir=(0, 0, -1)) * Cylinder(3, 28, mode=Mode.PRIVATE)
    add(fillet8_piece_1, mode=Mode.SUBTRACT)
    with BuildSketch(Plane(origin=(29.330127019, 6, 6), x_dir=(0, 1, 0), z_dir=(-1, 0, 0))) as fillet8_piece_2_section:
        with BuildLine():
            CenterArc((1.732050808, -2), FILLET8_R, 90, 60)
            Line((0, -1), (0, 0))
            Line((0, 0), (1.732050808, 0))
        make_face()
    fillet8_piece_2 = extrude(amount=10.330127019, mode=Mode.PRIVATE)
    fillet8_piece_2 = fillet8_piece_2 - Plane(origin=(25, 10, 6), x_dir=(0, -1, 0), z_dir=(0, 0, -1)) * Cylinder(3, 28, mode=Mode.PRIVATE)
    add(fillet8_piece_2, mode=Mode.SUBTRACT)
    with BuildSketch(Plane(origin=(25, 6, 6), x_dir=(0, 1, 0), z_dir=(-1, 0, 0))) as fillet8_piece_3a_section:
        with BuildLine():
            CenterArc((1.732050808, -2), FILLET8_R, 90, 60)
            Line((0, -1), (0, 0))
            Line((0, 0), (1.732050808, 0))
        make_face()
    fillet8_piece_3a = extrude(amount=10.330127019, mode=Mode.PRIVATE)
    fillet8_piece_3a = split(fillet8_piece_3a, bisect_by=Plane(origin=(19, 6, 6), z_dir=(-1, 0, 0)), keep=Keep.TOP, mode=Mode.PRIVATE)
    with BuildSketch(Plane(origin=(19, 10.330127019, 6), x_dir=(-1, 0, 0), z_dir=(0, -1, 0))) as fillet8_piece_3b_section:
        with BuildLine():
            CenterArc((1.732050808, -2), FILLET8_R, 90, 60)
            Line((0, -1), (0, 0))
            Line((0, 0), (1.732050808, 0))
        make_face()
    fillet8_piece_3b = extrude(amount=10.330127019, mode=Mode.PRIVATE)
    fillet8_piece_3b = split(fillet8_piece_3b, bisect_by=Plane(origin=(19, 6, 6), z_dir=(0, 1, 0)), keep=Keep.TOP, mode=Mode.PRIVATE)
    fillet8_piece_3 = fillet8_piece_3a & fillet8_piece_3b
    add(fillet8_piece_3, mode=Mode.SUBTRACT)

    # Sketch46 → Cut-Extrude28 (cut)
    with BuildSketch(Plane.XY.offset(-6)):
        with Locations((21.074871131, 8)):
            Rectangle(SKETCH46_W, SKETCH46_H)
        with Locations((17, 3.925128869)):
            Rectangle(SKETCH46_W_2, SKETCH46_H_2)
    extrude(amount=-CUT_EXTRUDE28_DEPTH, mode=Mode.SUBTRACT)

    # Sketch43 → Cut-Extrude25 (cut)
    with BuildSketch(Plane.XY.offset(-4).offset(CUT_EXTRUDE25_START)):
        with BuildLine():
            Line((19, 0), (18, 0))
            ThreePointArc((18, 0), (17.121320344, 2.121320344), (15, 3))
            Line((15, 3), (19, 3))
            Line((19, 3), (19, 0))
        make_face()
    extrude(amount=CUT_EXTRUDE25_DEPTH, mode=Mode.SUBTRACT)

    # Sketch42 → Cut-Extrude24 (cut)
    with BuildSketch(Plane.XY.offset(-4).offset(CUT_EXTRUDE24_START)):
        with BuildLine():
            Line((22, 6), (25, 6))
            Line((25, 6), (25, 7))
            ThreePointArc((25, 7), (22.878679656, 7.878679656), (22, 10))
            Line((22, 10), (22, 6))
        make_face()
    extrude(amount=CUT_EXTRUDE24_DEPTH, mode=Mode.SUBTRACT)

    # Fillet9
    # the kernel refuses this fillet: 1 mm, written as the material it takes off along each edge
    with BuildSketch(Plane(origin=(21.392618485, 10, -7), x_dir=(1, 0, 0), z_dir=(0, 0, 1))) as fillet9_piece_1:
        with BuildLine():
            CenterArc((0.89509571, 0.957716316), FILLET9_R, 190.203399986, 63.075442435)
            Line((-0.089089388, 0.780573173), (-0.10877309, 0.77703031))
            ThreePointArc((-0.10877309, 0.77703031), (-0.051836033, 0.389454402), (-0.019975798, -0.000983607))
            Line((-0.019975798, -0.000983607), (0, -0.02))
            ThreePointArc((0, -0.02), (0.303690758, -0.02), (0.601627231, -0.019154326))
            Line((0.601627231, -0.019154326), (0.607381515, 0))
        make_face()
    extrude(amount=2.96410189, mode=Mode.SUBTRACT)
    with BuildSketch(Plane(origin=(15, 3.607381515, -7), x_dir=(0, -1, 0), z_dir=(0, 0, 1))) as fillet9_piece_2:
        with BuildLine():
            CenterArc((0.89509571, -0.957716316), FILLET9_R, 106.721157579, 63.075442435)
            Line((-0.089089388, -0.780573173), (-0.10877309, -0.77703031))
            ThreePointArc((-0.10877309, -0.77703031), (-0.051836033, -0.389454402), (-0.019975798, 0.000983607))
            Line((-0.019975798, 0.000983607), (0, 0.02))
            ThreePointArc((0, 0.02), (0.303690758, 0.02), (0.601627231, 0.019154326))
            Line((0.601627231, 0.019154326), (0.607381515, 0))
        make_face()
    extrude(amount=2.96410189, mode=Mode.SUBTRACT)

    # Fillet10
    fillet10_edges = [part.edges().sort_by_distance(p)[0] for p in [
        (11.815660034, 10.5, -3.25),
        (14.5, 13.184339966, -3.25),
    ]]
    fillet(fillet10_edges, radius=FILLET10_R)

    # Sketch47 → Boss-Extrude7 (add)
    with BuildSketch(Plane(origin=(0, 2.5, 0), x_dir=(1, 0, 0), z_dir=(0, 1, 0))):
        with Locations((19.5, 19.5)):
            Rectangle(SKETCH47_W, SKETCH47_H)
        with Locations((-19.5, 19.5)):
            Rectangle(SKETCH47_W, SKETCH47_H)
        with Locations((19.5, -19.5)):
            Rectangle(SKETCH47_W, SKETCH47_H)
        with Locations((-19.5, -19.5)):
            Rectangle(SKETCH47_W, SKETCH47_H)
    extrude(amount=BOSS_EXTRUDE7_DEPTH)

    # M1.6 Tapped Hole1
    with Locations(Plane(origin=(0, 38, 0), x_dir=(1, 0, 0), z_dir=(0, 1, 0))):
        with Locations((-20, -20), (-20, 20), (20, 20), (20, -20)):
            Hole(M1_6_TAPPED_HOLE1_D / 2, depth=M1_6_TAPPED_HOLE1_DEPTH)
            with Locations((0, 0, -(M1_6_TAPPED_HOLE1_DEPTH + M1_6_TAPPED_HOLE1_TIP / 2))):  # 118° drill point
                Cone(0, M1_6_TAPPED_HOLE1_D / 2, M1_6_TAPPED_HOLE1_TIP, mode=Mode.SUBTRACT)


solid = part.part
